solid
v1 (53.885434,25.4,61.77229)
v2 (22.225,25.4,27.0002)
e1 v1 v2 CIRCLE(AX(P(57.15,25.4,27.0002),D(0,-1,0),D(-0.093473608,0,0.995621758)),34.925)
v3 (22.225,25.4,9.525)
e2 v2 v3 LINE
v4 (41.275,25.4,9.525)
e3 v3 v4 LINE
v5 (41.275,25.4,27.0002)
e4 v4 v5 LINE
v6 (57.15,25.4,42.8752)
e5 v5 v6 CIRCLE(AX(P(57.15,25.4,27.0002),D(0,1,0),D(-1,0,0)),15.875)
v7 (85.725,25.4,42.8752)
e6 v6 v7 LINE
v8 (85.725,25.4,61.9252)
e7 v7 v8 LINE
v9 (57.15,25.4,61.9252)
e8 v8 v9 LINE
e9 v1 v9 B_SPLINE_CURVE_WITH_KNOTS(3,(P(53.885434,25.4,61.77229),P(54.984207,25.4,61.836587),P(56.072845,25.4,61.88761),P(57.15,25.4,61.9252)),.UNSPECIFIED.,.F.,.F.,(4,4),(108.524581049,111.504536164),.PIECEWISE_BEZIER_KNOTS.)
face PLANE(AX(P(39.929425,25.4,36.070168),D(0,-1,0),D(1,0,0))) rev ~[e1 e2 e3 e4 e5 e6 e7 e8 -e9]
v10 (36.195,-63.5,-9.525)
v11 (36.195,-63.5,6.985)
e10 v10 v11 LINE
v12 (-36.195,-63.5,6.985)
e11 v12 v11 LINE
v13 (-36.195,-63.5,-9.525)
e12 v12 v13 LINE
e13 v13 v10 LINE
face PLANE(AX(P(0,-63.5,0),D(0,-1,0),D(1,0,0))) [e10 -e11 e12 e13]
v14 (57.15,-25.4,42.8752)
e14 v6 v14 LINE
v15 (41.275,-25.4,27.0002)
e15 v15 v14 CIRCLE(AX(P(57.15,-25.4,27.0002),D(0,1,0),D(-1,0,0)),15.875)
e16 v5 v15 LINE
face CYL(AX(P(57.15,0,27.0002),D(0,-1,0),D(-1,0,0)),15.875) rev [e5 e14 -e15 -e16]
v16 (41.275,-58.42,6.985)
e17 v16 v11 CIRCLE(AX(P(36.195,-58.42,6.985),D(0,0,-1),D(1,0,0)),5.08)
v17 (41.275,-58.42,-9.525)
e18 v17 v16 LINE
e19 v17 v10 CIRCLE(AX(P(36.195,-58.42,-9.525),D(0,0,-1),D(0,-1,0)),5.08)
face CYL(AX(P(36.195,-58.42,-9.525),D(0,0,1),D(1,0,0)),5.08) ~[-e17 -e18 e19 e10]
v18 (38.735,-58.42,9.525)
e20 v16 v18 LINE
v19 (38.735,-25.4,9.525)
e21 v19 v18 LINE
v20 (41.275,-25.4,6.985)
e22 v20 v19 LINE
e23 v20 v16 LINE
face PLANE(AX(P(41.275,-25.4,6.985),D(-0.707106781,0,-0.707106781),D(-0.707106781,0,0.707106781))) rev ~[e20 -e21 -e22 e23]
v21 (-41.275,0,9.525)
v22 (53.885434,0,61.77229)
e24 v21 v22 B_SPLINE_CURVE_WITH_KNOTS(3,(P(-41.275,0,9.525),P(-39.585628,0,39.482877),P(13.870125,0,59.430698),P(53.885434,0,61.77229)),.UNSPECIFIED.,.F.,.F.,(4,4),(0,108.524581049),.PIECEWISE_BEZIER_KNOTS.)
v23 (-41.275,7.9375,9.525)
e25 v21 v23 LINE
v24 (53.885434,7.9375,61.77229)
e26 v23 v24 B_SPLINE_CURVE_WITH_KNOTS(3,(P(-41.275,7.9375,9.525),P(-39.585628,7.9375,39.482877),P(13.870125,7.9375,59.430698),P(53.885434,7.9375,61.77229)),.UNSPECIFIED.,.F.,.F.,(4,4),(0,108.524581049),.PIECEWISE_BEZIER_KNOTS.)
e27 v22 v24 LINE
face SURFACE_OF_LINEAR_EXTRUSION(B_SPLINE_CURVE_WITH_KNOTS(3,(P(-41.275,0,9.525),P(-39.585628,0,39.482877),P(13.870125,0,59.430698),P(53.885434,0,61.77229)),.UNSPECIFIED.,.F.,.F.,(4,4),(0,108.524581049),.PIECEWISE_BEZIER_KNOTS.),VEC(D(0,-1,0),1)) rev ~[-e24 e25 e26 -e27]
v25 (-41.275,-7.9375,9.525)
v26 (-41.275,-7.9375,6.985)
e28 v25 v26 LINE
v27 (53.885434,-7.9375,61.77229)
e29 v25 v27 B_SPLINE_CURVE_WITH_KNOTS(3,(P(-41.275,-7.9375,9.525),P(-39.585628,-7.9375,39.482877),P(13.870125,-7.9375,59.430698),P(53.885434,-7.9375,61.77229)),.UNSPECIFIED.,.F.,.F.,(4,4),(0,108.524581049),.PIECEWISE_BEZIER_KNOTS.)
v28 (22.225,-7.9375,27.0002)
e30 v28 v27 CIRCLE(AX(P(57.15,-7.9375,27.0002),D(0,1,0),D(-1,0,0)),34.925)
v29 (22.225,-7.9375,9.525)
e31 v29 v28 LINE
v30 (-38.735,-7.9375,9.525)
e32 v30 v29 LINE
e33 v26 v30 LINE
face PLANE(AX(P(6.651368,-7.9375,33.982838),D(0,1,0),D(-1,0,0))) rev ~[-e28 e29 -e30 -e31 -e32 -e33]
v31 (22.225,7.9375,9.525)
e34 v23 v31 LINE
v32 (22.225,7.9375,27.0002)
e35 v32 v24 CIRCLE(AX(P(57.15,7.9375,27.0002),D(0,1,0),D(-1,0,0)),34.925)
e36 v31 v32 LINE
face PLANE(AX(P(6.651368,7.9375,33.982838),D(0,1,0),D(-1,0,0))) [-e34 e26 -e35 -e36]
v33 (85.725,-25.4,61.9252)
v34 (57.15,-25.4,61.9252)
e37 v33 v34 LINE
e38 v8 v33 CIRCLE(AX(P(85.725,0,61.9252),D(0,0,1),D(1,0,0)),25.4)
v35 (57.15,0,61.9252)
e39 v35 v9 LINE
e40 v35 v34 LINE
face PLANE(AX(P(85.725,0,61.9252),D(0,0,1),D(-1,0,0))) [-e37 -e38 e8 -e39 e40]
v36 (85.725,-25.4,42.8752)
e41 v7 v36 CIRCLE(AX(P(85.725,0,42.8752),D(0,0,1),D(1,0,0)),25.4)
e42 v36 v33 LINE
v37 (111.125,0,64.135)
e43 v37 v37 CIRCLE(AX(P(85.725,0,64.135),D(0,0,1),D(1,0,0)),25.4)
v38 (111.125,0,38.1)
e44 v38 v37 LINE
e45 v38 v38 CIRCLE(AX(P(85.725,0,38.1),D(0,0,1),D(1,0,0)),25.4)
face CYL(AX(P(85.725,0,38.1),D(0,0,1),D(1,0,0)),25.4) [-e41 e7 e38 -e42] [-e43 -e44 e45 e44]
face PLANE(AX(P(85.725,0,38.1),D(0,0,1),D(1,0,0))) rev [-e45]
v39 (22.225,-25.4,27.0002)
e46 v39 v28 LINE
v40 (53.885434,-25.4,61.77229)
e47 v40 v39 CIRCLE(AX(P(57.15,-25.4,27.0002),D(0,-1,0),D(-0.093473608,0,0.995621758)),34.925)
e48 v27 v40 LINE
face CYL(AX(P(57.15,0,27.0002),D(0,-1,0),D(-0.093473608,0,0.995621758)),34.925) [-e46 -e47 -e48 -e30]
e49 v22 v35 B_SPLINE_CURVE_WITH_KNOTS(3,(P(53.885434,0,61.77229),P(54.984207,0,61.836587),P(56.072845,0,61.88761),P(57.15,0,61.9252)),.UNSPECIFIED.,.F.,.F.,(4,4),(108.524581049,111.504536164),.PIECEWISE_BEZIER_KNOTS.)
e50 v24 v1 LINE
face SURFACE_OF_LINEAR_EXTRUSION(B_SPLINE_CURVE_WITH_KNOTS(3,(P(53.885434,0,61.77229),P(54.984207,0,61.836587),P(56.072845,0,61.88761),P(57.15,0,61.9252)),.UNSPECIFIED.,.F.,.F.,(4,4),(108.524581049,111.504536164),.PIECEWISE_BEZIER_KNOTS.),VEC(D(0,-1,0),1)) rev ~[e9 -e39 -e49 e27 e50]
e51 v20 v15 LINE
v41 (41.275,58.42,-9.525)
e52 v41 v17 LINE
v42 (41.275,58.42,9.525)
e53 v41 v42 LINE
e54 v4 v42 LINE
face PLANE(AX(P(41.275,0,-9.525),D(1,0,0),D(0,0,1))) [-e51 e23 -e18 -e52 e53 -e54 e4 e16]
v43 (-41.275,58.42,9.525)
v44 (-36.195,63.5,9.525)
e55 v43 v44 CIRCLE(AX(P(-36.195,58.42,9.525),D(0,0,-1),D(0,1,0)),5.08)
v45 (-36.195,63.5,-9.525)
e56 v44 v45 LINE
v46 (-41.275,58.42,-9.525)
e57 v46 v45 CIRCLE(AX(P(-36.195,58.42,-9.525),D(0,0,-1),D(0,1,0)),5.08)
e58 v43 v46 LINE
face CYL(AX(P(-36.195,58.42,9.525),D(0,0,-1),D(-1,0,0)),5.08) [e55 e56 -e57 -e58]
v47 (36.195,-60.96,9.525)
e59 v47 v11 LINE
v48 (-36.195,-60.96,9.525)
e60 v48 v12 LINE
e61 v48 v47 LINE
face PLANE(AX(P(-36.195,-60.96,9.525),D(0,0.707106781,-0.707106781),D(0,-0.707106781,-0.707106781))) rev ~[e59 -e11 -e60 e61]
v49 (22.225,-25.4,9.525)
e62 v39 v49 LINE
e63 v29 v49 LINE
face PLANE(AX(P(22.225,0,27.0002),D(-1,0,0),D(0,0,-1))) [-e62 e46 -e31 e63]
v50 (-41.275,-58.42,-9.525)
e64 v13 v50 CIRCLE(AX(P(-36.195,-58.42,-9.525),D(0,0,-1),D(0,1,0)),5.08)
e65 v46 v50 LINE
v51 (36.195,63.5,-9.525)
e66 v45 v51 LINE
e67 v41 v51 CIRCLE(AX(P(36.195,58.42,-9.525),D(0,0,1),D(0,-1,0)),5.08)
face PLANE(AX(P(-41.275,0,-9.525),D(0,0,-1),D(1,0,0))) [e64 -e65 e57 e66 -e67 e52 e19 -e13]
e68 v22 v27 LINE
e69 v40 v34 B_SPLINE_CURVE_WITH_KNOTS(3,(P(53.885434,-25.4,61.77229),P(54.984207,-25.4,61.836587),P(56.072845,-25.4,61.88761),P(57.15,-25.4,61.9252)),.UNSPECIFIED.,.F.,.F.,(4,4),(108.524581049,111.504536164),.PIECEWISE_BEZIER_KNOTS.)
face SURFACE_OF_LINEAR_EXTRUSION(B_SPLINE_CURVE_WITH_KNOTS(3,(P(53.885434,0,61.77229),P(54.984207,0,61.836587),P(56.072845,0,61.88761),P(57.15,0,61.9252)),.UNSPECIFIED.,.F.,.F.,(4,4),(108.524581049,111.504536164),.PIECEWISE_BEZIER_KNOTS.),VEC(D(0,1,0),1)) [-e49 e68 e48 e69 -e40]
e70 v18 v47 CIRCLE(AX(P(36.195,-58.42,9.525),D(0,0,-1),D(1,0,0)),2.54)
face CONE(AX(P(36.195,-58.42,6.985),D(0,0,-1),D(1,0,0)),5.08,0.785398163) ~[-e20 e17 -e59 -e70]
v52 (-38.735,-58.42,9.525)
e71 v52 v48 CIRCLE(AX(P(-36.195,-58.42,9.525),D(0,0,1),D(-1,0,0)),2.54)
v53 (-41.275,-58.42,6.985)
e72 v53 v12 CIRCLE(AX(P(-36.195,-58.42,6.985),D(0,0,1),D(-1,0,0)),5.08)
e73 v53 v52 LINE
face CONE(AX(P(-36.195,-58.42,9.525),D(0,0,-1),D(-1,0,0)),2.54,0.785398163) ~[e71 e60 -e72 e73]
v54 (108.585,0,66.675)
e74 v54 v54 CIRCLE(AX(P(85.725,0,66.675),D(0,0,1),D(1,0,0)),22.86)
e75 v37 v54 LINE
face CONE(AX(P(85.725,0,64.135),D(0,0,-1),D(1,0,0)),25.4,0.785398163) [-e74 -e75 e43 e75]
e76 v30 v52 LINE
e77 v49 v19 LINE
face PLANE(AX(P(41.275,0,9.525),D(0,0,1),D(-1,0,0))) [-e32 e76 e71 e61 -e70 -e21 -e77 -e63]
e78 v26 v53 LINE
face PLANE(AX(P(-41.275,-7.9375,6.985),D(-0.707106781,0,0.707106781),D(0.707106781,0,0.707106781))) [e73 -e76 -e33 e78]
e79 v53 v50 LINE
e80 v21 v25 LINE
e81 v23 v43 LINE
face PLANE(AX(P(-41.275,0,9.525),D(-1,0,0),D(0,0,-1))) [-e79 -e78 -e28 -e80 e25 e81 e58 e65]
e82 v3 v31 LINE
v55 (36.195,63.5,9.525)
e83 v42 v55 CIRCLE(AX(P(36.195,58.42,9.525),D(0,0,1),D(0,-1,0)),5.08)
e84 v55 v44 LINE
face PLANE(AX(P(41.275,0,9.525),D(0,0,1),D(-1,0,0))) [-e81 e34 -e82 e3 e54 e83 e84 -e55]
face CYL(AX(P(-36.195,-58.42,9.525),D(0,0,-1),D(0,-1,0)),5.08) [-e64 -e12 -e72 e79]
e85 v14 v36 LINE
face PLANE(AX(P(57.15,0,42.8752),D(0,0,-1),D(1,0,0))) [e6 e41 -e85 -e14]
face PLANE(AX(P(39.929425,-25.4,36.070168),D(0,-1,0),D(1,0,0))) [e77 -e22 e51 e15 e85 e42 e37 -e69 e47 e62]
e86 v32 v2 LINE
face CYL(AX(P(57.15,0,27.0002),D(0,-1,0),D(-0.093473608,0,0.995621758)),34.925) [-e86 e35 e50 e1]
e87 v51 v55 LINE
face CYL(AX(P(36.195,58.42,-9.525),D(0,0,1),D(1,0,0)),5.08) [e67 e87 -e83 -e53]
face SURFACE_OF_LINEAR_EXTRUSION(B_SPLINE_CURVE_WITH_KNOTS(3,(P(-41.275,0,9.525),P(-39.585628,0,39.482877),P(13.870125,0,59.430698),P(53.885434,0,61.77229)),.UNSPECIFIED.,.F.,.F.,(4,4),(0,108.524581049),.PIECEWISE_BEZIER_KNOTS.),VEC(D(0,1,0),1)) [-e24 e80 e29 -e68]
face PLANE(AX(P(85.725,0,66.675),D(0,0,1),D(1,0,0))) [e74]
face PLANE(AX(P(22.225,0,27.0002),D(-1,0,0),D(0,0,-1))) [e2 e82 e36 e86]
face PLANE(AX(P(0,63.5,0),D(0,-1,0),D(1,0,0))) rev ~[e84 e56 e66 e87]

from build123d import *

# Parameters (mm, degrees)
F1_DEPTH     = 63.5
F0_W         = 25.4
F0_H         = 19.05
F2_DEPTH     = 25.4
F3_DEPTH     = 7.9375
F5_R         = 5.08
F6_T1_DEPTH  = 72.39
F6_T3_DEPTH  = 33.02
F6_T5_DEPTH  = 50.4825
F6_T10_ANGLE = 90
F6_T12_ANGLE = 90


# Not quite as in the source:
# - a fillet or chamfer that OpenCascade refuses, or shapes differently, is made with other operations: its cross-section is extruded or revolved along the edge and cut away or added


with BuildPart() as f1:
    # F0 (on Front) → F1 (new body, symmetric)
    with BuildSketch(Plane.XZ):
        Polygon((22.225, 9.525), (-41.275, 9.525), (-41.275, -9.525), (41.275, -9.525), (41.275, 9.525), align=None)
    extrude(amount=F1_DEPTH, both=True)

    # F0 (on Front) → F2 (join, symmetric)
    with BuildSketch(Plane.XZ):
        with BuildLine():
            Line((22.225, 27.0002), (22.225, 9.525))
            Line((22.225, 9.525), (41.275, 9.525))
            Line((41.275, 9.525), (41.275, 27.0002))
            ThreePointArc((41.275, 27.0002), (45.9246798487, 38.2255201513), (57.15, 42.8752))
            Line((57.15, 42.8752), (60.325, 42.8752))
            Line((60.325, 42.8752), (60.325, 61.9252))
            Line((60.325, 61.9252), (57.15, 61.9252))
            add(Edge.make_bspline(
                [(53.8854342407, 61.7722898912), (54.9842067368, 61.8365871986), (56.0728453275, 61.8876096574), (57.15, 61.9252)],
                knots=[108.5245810491, 108.5245810491, 108.5245810491, 108.5245810491, 111.5045361635, 111.5045361635, 111.5045361635, 111.5045361635], degree=3))
            ThreePointArc((53.8854342407, 61.7722898912), (31.3258777096, 50.5133948686), (22.225, 27.0002))
        make_face()
        with Locations((73.025, 52.4002)):
            Rectangle(F0_W, F0_H)
    extrude(amount=F2_DEPTH, both=True)

    # F0 (on Front) → F3 (join, symmetric)
    with BuildSketch(Plane.XZ):
        with BuildLine():
            add(Edge.make_bspline(
                [(-41.275, 9.525), (-39.5856284224, 39.4828766469), (13.870125209, 59.4306981306), (53.8854342407, 61.7722898912)],
                knots=[0, 0, 0, 0, 108.5245810491, 108.5245810491, 108.5245810491, 108.5245810491], degree=3))
            Line((-41.275, 9.525), (22.225, 9.525))
            Line((22.225, 9.525), (22.225, 27.0002))
            ThreePointArc((22.225, 27.0002), (31.3258777096, 50.5133948686), (53.8854342407, 61.7722898912))
        make_face()
    extrude(amount=F3_DEPTH, both=True)

    # F0 (on Front) → F4 (revolve)
    with BuildSketch(Plane.XZ):
        Polygon((85.725, 66.675), (85.725, 61.9252), (85.725, 42.8752), (85.725, 38.1), (111.125, 38.1), (111.125, 66.675), align=None)
    revolve(axis=Axis((85.725, 0, 52.3875), (0, 0, 1)))

    # F5
    f5_edges = [f1.edges().sort_by_distance(p)[0] for p in [
        (41.275, -63.5, 0),
        (-41.275, -63.5, 0),
        (41.275, 63.5, 0),
        (-41.275, 63.5, 0),
    ]]
    fillet(f5_edges, radius=F5_R)

    # F6: chamfer of 2.54 on 6 edges, made by hand

    # F6_s2 → F6_t1 (cut)
    with BuildSketch(Plane.YZ.offset(-36.195)):
        Polygon((-60.96, 9.525), (-63.5, 6.985), (-63.5, 9.525), align=None)
    extrude(amount=F6_T1_DEPTH, mode=Mode.SUBTRACT)

    # F6_s4 → F6_t3 (cut)
    with BuildSketch(Plane.XZ.offset(25.4)):
        Polygon((41.275, 6.985), (38.735, 9.525), (41.275, 9.525), align=None)
    extrude(amount=F6_T3_DEPTH, mode=Mode.SUBTRACT)

    # F6_s6 → F6_t5 (cut)
    with BuildSketch(Plane.XZ.offset(7.9375)):
        Polygon((-41.275, 6.985), (-38.735, 9.525), (-41.275, 9.525), align=None)
    extrude(amount=F6_T5_DEPTH, mode=Mode.SUBTRACT)

    # F6_s7 → F6_t8 (revolve, cut)
    with BuildSketch(Plane.XZ):
        Polygon((111.125, 64.135), (108.585, 66.675), (111.125, 66.675), align=None)
    revolve(axis=Axis((85.725, 0, 66.675), (0, 0, 1)), mode=Mode.SUBTRACT)

    # F6_s9 → F6_t10 (revolve, cut)
    with BuildSketch(Plane.XZ.offset(58.42)):
        Polygon((41.275, 6.985), (38.735, 9.525), (41.275, 9.525), align=None)
    revolve(axis=Axis((36.195, -58.42, 9.525), (0, 0, -1)), revolution_arc=F6_T10_ANGLE, mode=Mode.SUBTRACT)

    # F6_s11 → F6_t12 (revolve, cut)
    with BuildSketch(Plane.XZ.offset(58.42)):
        Polygon((-38.735, 9.525), (-41.275, 6.985), (-41.275, 9.525), align=None)
    revolve(axis=Axis((-36.195, -58.42, 9.525), (0, 0, 1)), revolution_arc=F6_T12_ANGLE, mode=Mode.SUBTRACT)


solid = f1.part
